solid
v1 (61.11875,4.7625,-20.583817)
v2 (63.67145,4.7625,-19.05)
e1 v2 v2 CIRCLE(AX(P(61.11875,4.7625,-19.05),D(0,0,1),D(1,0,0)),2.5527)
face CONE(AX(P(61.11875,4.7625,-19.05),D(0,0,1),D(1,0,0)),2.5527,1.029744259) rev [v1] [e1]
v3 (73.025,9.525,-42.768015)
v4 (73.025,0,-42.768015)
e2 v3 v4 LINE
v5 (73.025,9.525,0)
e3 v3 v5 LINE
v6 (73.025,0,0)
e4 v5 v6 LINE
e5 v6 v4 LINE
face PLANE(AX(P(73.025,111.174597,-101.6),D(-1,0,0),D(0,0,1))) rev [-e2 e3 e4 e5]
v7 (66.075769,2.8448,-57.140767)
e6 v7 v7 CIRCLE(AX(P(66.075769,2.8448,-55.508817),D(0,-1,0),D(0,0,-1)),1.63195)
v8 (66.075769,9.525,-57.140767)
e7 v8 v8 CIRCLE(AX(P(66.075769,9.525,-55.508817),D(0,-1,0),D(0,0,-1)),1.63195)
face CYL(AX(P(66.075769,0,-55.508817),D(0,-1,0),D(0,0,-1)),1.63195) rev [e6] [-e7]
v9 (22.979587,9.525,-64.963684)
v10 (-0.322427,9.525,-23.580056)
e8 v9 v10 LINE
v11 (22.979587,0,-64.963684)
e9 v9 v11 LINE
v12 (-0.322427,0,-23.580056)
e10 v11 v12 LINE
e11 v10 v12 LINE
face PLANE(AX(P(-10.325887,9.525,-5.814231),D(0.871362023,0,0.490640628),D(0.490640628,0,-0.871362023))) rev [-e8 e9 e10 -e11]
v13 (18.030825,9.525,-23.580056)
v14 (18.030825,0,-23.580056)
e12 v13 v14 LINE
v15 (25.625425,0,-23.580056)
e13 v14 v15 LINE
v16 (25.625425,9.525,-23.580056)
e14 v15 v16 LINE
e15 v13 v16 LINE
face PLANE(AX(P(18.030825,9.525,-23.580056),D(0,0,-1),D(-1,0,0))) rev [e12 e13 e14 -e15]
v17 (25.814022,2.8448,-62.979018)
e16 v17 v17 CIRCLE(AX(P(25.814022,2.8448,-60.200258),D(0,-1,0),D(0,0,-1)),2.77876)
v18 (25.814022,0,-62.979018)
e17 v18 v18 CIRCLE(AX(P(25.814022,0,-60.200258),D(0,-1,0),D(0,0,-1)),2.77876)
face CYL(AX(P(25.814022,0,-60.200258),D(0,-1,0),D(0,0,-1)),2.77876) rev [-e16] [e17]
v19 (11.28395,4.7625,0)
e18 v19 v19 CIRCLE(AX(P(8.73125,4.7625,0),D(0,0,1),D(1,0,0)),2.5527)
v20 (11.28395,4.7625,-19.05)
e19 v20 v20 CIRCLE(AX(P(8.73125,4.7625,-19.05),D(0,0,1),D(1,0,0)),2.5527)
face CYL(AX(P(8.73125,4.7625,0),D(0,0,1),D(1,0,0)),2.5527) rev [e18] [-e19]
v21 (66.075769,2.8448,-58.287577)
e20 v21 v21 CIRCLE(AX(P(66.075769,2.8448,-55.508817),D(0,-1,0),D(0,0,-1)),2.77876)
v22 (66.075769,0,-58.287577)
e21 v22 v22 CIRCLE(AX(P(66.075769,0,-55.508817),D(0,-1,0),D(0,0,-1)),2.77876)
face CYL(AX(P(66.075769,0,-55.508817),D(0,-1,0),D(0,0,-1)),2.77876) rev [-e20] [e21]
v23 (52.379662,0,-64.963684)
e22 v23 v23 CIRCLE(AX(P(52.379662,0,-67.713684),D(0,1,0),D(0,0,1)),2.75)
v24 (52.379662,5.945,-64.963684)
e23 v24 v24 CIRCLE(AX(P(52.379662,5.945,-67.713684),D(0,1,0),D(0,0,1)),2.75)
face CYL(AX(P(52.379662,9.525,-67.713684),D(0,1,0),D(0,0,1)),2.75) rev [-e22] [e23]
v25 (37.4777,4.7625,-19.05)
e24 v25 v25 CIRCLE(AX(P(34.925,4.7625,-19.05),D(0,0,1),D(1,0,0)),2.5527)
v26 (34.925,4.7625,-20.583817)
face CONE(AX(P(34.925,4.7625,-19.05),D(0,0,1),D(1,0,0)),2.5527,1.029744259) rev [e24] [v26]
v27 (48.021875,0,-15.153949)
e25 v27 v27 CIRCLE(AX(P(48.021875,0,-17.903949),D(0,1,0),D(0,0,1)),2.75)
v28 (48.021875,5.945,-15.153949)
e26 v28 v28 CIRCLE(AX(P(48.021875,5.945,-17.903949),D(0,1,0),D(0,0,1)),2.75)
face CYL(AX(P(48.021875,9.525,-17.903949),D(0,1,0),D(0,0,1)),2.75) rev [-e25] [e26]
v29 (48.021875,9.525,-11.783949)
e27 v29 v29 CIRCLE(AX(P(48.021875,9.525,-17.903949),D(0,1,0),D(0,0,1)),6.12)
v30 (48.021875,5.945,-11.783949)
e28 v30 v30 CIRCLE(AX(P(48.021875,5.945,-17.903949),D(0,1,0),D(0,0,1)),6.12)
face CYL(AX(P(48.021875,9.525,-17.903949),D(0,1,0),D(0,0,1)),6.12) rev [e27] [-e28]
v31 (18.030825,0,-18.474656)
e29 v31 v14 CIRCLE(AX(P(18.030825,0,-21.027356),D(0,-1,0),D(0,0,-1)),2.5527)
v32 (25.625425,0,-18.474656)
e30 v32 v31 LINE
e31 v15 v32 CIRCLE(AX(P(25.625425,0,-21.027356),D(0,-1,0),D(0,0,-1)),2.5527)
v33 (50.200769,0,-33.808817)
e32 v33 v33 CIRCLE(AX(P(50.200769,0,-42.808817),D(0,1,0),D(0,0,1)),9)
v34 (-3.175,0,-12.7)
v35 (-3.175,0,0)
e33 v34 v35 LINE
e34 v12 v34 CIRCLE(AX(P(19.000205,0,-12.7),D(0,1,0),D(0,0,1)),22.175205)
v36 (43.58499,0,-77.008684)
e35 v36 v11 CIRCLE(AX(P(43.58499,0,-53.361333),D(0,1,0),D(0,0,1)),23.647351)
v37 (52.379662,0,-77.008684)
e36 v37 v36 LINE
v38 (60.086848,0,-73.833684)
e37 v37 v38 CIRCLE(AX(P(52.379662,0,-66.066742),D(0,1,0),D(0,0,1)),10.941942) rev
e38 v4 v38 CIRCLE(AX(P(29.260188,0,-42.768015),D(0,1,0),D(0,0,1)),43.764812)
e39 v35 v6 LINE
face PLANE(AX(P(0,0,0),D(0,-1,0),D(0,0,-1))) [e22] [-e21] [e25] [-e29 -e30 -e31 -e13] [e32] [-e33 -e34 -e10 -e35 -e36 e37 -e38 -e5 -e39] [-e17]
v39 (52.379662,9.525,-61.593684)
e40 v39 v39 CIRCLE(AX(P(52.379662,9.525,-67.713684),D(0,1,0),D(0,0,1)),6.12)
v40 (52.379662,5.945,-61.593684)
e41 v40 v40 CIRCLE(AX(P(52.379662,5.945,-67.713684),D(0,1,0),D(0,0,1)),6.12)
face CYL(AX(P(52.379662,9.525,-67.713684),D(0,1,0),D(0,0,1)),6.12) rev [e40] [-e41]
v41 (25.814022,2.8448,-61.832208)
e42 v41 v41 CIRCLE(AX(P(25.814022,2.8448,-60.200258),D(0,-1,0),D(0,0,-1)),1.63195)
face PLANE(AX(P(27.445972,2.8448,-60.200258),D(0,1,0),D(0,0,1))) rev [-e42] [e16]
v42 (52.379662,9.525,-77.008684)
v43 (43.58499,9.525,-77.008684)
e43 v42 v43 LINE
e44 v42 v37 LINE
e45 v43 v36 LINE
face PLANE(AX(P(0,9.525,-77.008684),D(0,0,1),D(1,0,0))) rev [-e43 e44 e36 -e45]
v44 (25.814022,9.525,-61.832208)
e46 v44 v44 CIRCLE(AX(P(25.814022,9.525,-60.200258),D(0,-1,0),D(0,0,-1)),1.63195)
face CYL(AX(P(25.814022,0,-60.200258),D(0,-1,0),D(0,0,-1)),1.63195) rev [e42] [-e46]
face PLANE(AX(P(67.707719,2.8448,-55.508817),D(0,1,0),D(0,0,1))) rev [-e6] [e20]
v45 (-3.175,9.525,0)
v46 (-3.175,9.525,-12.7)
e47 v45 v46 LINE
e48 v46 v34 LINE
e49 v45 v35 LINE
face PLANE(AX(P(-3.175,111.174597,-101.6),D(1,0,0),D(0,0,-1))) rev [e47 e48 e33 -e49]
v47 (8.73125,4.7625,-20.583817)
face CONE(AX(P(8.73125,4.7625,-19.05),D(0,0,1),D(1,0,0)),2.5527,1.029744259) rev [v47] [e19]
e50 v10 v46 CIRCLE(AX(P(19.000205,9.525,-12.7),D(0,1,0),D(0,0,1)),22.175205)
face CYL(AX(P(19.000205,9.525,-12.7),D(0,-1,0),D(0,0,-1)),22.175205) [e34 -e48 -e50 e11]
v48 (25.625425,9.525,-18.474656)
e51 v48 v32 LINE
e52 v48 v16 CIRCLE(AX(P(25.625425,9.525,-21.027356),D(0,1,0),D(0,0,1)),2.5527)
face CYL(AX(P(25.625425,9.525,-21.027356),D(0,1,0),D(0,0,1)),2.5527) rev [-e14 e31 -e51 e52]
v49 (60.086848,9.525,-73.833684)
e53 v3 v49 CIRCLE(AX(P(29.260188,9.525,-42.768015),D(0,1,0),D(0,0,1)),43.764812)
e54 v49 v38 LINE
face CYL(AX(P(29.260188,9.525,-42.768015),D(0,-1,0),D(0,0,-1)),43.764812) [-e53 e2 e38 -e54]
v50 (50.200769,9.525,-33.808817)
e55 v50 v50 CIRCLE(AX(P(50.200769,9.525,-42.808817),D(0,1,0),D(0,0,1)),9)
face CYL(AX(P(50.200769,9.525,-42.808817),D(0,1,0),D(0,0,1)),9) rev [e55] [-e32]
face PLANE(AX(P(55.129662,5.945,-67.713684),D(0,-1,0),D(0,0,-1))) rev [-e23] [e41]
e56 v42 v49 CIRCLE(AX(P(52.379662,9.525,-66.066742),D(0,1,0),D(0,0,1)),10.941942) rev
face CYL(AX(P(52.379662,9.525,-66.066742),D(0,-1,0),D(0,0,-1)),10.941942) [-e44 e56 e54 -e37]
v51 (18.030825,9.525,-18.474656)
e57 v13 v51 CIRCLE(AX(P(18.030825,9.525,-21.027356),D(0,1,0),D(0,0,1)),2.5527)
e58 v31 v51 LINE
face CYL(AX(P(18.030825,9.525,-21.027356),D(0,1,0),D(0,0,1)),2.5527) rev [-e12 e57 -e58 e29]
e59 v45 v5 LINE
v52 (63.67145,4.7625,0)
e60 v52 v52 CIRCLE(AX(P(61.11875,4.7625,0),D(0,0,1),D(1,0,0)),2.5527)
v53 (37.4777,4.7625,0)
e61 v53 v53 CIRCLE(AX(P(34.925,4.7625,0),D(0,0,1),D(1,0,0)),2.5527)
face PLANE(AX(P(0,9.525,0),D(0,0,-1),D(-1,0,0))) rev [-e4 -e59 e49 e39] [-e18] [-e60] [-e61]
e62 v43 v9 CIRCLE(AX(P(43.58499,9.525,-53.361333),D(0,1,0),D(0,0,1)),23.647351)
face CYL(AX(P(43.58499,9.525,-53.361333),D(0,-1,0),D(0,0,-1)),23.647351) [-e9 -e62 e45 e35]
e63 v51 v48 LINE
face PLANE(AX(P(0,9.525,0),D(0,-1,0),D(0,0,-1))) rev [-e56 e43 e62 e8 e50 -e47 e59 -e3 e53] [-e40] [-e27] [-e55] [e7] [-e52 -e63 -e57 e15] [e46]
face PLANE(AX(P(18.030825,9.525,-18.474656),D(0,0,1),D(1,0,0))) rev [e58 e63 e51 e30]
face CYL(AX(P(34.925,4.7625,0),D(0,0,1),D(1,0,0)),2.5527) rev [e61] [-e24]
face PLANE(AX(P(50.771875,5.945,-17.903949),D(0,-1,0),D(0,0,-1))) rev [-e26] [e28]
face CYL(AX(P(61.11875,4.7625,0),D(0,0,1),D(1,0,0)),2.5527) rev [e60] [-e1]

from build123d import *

# Parameters (mm, degrees)
SKETCH1_W                                      = 69.85
SKETCH1_H                                      = 101.6
BOSS_EXTRUDE1_DEPTH                            = 9.525
F_1_4_20_TAPPED_HOLE1_D                        = 5.1054
F_1_4_20_TAPPED_HOLE1_DEPTH                    = 19.05
F_1_4_20_TAPPED_HOLE1_TIP                      = 1.533816902
F_18_0_18_DIAMETER_HOLE1_D                     = 18
CBORE_FOR_M5_HEX_HEAD_BOLT1_D                  = 5.5
CBORE_FOR_M5_HEX_HEAD_BOLT1_CBORE_D            = 12.24
CBORE_FOR_M5_HEX_HEAD_BOLT1_CBORE_DEPTH        = 3.58
CBORE_FOR_4_SOCKET_HEAD_CAP_SCREW1_D           = 3.2639
CBORE_FOR_4_SOCKET_HEAD_CAP_SCREW1_CBORE_D     = 5.55752
CBORE_FOR_4_SOCKET_HEAD_CAP_SCREW1_CBORE_DEPTH = 2.8448
F_10_CLEARANCE_SLOT1_DEPTH                     = 9.525
SKETCH23_W                                     = 3.175
SKETCH23_H                                     = 101.6
BOSS_EXTRUDE2_DEPTH                            = 9.525
CUT_EXTRUDE2_DEPTH                             = 126.482812568


# Read off the part's stored shape, not the designer's step: #10 Clearance Slot1
with BuildPart() as part:
    # Sketch1 → Boss-Extrude1 (new body)
    with BuildSketch(Plane(origin=(0, 0, 0), x_dir=(1, 0, 0), z_dir=(0, 1, 0))):
        with Locations((34.925, 50.8)):
            Rectangle(SKETCH1_W, SKETCH1_H)
    extrude(amount=BOSS_EXTRUDE1_DEPTH)

    # 1/4-20 Tapped Hole1
    with Locations(Plane.XY):
        with Locations((8.73125, 4.7625), (61.11875, 4.7625), (34.925, 4.7625)):
            Hole(F_1_4_20_TAPPED_HOLE1_D / 2, depth=F_1_4_20_TAPPED_HOLE1_DEPTH)
            with Locations((0, 0, -(F_1_4_20_TAPPED_HOLE1_DEPTH + F_1_4_20_TAPPED_HOLE1_TIP / 2))):  # 118° drill point
                Cone(0, F_1_4_20_TAPPED_HOLE1_D / 2, F_1_4_20_TAPPED_HOLE1_TIP, mode=Mode.SUBTRACT)

    # Ø18.0 (18) Diameter Hole1 (through all)
    with Locations(Plane(origin=(0, 9.525, 0), x_dir=(1, 0, 0), z_dir=(0, 1, 0))):
        with Locations((50.200768572, 42.808816902)):
            Hole(F_18_0_18_DIAMETER_HOLE1_D / 2)

    # CBORE for M5 Hex Head Bolt1 (through all)
    with Locations(Plane(origin=(0, 9.525, 0), x_dir=(1, 0, 0), z_dir=(0, 1, 0))):
        with Locations((52.379662144, 67.713684392), (48.021875, 17.903949412)):
            CounterBoreHole(CBORE_FOR_M5_HEX_HEAD_BOLT1_D / 2, CBORE_FOR_M5_HEX_HEAD_BOLT1_CBORE_D / 2, CBORE_FOR_M5_HEX_HEAD_BOLT1_CBORE_DEPTH)

    # CBORE for #4 Socket Head Cap Screw1 (through all)
    with Locations(Plane(origin=(0, 0, 0), x_dir=(-1, 0, 0), z_dir=(0, -1, 0))):
        with Locations((-25.814021811, 60.200257539), (-66.075768572, 55.508816902)):
            CounterBoreHole(CBORE_FOR_4_SOCKET_HEAD_CAP_SCREW1_D / 2, CBORE_FOR_4_SOCKET_HEAD_CAP_SCREW1_CBORE_D / 2, CBORE_FOR_4_SOCKET_HEAD_CAP_SCREW1_CBORE_DEPTH)

    # #10 Clearance Slot1 outline → #10 Clearance Slot1 (cut)
    with BuildSketch(Plane(origin=(0, 0, 0), x_dir=(1, 0, 0), z_dir=(0, 1, 0))):
        with BuildLine():
            Line((18.030825, 18.474656367), (25.625425, 18.474656367))
            ThreePointArc((25.625425, 18.474656367), (28.178125, 21.027356367), (25.625425, 23.580056367))
            Line((25.625425, 23.580056367), (18.030825, 23.580056367))
            ThreePointArc((18.030825, 23.580056367), (15.478125, 21.027356367), (18.030825, 18.474656367))
        make_face()
    extrude(amount=F_10_CLEARANCE_SLOT1_DEPTH, mode=Mode.SUBTRACT)

    # Sketch23 → Boss-Extrude2 (add)
    with BuildSketch(Plane(origin=(0, 0, 0), x_dir=(1, 0, 0), z_dir=(0, 1, 0))):
        with Locations((71.4375, 50.8)):
            Rectangle(SKETCH23_W, SKETCH23_H)
        with Locations((-1.5875, 50.8)):
            Rectangle(SKETCH23_W, SKETCH23_H)
    extrude(amount=BOSS_EXTRUDE2_DEPTH)

    # Sketch24 → Cut-Extrude2 (cut, through all)
    with BuildSketch(Plane(origin=(0, 0, 0), x_dir=(1, 0, 0), z_dir=(0, 1, 0))):
        with BuildLine():
            ThreePointArc((60.086847532, 73.833684392), (69.661188781, 59.594122619), (73.025, 42.768014811))
            Line((73.025, 42.768014811), (73.025, 101.6))
            Line((73.025, 101.6), (-3.175, 101.6))
            Line((-3.175, 101.6), (-3.175, 12.7))
            ThreePointArc((-3.175, 12.7), (-2.45000516, 18.323895492), (-0.322426517, 23.580056367))
            Line((-0.322426517, 23.580056367), (22.97958653, 64.963684392))
            ThreePointArc((22.97958653, 64.963684392), (31.651165616, 73.776549238), (43.584990358, 77.008684392))
            Line((43.584990358, 77.008684392), (52.379662144, 77.008684392))
            ThreePointArc((52.379662144, 77.008684392), (56.547435278, 76.183844834), (60.086847532, 73.833684392))
        make_face()
    extrude(amount=CUT_EXTRUDE2_DEPTH, mode=Mode.SUBTRACT)


solid = part.part
